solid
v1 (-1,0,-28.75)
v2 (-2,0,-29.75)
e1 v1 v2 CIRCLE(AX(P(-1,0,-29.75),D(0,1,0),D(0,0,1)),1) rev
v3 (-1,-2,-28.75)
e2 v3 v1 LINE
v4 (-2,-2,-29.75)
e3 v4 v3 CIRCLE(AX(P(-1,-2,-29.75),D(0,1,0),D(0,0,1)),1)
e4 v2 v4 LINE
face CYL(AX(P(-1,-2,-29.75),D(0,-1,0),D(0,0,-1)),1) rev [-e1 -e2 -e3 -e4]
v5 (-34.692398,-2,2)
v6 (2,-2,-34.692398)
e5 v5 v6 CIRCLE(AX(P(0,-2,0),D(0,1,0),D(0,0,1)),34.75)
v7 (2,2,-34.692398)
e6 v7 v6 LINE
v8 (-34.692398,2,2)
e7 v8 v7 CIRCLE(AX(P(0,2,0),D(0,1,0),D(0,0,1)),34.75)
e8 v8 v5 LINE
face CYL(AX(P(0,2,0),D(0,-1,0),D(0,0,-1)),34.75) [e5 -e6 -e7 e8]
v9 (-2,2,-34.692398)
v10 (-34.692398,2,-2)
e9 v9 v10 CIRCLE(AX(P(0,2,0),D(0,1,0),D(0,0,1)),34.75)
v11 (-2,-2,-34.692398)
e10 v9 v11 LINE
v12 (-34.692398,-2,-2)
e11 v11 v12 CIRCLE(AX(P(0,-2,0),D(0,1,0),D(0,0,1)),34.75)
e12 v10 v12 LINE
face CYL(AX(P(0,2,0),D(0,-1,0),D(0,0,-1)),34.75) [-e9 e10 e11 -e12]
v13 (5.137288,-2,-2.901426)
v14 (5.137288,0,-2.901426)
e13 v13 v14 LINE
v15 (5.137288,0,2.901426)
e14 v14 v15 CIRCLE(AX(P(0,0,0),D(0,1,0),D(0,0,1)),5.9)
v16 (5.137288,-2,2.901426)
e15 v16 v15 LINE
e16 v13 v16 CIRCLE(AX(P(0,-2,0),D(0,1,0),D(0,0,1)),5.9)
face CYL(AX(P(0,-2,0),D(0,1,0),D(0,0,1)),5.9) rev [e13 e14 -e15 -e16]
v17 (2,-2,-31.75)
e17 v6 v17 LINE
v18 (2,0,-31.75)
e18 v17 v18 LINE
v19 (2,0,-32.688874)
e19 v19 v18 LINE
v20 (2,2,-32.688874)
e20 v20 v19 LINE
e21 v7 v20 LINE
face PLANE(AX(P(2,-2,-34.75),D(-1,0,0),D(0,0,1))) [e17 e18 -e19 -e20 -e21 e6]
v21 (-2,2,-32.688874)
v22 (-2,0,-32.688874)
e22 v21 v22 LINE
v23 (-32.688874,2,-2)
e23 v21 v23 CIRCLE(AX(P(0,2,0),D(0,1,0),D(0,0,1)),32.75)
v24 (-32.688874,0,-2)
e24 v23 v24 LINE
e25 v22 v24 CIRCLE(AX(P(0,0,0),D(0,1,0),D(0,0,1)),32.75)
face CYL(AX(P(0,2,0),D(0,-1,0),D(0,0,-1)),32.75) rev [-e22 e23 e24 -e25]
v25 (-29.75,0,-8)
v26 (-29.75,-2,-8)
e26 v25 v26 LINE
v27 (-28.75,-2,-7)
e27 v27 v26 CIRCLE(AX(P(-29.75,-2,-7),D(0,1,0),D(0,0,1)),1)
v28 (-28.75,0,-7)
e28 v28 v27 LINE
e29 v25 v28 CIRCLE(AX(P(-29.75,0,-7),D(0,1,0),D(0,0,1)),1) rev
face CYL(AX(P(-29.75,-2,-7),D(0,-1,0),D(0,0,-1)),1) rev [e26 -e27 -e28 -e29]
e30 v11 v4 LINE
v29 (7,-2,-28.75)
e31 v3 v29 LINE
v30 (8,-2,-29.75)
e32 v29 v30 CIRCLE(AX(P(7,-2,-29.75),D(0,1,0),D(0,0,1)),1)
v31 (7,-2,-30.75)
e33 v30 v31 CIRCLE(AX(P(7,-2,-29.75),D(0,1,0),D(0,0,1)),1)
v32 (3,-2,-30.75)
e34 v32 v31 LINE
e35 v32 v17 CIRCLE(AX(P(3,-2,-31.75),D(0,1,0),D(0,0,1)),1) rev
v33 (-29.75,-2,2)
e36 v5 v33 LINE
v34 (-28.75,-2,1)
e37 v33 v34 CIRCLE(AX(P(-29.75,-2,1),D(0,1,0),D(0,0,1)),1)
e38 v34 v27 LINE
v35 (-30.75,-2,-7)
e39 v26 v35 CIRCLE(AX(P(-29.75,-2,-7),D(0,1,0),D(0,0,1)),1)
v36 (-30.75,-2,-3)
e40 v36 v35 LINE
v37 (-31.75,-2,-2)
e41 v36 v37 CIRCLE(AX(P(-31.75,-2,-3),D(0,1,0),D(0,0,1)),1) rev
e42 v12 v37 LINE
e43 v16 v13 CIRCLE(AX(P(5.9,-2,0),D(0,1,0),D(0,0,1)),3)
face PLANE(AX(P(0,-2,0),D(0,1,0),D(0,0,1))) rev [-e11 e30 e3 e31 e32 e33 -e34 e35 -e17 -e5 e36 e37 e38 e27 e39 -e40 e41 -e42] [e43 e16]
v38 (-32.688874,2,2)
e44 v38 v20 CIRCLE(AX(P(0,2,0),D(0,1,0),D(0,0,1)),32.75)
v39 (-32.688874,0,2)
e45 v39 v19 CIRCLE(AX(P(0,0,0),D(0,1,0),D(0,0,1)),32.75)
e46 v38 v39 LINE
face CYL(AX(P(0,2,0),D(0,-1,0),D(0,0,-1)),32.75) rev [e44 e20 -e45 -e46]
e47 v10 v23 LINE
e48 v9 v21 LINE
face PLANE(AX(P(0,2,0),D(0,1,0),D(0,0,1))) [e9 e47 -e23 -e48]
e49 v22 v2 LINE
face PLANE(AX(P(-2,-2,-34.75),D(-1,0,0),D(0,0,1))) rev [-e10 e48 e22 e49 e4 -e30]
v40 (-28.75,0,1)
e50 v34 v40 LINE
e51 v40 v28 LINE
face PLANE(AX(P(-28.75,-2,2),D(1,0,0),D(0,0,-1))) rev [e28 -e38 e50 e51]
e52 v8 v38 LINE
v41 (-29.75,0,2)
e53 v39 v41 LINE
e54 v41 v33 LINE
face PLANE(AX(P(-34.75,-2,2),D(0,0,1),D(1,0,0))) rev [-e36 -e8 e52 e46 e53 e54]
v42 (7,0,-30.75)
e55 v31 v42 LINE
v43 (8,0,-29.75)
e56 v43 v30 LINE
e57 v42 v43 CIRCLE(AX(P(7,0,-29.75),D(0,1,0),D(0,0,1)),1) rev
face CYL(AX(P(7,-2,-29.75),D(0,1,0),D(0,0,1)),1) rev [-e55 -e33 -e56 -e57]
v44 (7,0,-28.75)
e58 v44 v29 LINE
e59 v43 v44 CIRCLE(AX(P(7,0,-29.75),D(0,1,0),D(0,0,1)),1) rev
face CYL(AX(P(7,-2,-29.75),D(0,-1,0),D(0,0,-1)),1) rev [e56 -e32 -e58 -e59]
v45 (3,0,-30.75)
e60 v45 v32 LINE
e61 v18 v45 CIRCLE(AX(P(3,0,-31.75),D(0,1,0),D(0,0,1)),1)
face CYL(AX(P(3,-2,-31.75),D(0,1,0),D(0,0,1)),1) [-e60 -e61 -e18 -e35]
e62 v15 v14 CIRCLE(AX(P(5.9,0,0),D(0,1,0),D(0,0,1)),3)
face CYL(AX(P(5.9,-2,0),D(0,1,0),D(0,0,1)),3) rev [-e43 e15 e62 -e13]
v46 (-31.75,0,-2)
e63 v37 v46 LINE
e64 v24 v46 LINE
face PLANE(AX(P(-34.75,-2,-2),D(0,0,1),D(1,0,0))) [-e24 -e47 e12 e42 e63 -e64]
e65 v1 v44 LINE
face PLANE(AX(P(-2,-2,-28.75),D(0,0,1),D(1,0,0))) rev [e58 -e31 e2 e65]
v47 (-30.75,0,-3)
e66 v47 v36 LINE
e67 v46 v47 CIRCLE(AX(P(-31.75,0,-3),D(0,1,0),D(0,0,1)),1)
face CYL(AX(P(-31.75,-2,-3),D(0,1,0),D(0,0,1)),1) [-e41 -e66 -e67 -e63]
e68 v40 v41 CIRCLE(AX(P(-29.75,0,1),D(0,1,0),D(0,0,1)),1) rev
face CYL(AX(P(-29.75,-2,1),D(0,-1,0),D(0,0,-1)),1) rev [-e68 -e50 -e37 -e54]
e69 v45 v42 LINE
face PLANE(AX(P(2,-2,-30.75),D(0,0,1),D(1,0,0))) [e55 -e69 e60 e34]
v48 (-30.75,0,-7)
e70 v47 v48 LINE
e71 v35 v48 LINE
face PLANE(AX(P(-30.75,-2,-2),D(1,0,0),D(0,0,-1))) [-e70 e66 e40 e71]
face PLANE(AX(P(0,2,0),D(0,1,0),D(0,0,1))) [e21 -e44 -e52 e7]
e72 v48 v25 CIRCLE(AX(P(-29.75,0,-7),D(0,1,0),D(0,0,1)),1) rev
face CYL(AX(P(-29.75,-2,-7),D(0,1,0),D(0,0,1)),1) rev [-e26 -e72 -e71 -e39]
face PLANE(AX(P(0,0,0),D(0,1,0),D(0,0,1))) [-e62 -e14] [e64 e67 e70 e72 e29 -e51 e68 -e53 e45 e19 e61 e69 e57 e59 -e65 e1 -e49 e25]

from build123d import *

# Parameters (mm, degrees)
SKETCH1_R                     = 32.75
OUTER_DISK_DEPTH              = 2
ENCLOSEMENT_T                 = 2
HOOK_RELEASE_DEPTH            = 50.184601249
CIRPATTERN1_COUNT             = 2
CIRPATTERN1_ANGLE             = 90
SERVO_MOTOR_CUTOUT_DEPTH      = 50.184601249
SERVO_MOTOR_CUTOUT_DEPTH_BACK = 50.184601249
SKETCH3_R                     = 3
SKETCH3_R_2                   = 5.9
FILLET1_R                     = 1


with BuildPart() as part:
    # Sketch1 → Outer DIsk (new body)
    with BuildSketch(Plane(origin=(0, 0, 0), x_dir=(1, 0, 0), z_dir=(0, 1, 0))):
        with Locations(Location((0, 0, 0), (0, 0, 270))):
            Circle(SKETCH1_R)
    extrude(amount=OUTER_DISK_DEPTH)

    # Enclosement
    enclosement_openings = [part.faces().sort_by_distance(p)[0] for p in [
        (0, 2, 0),
    ]]
    offset(amount=ENCLOSEMENT_T, openings=enclosement_openings, kind=Kind.INTERSECTION)

    # Sketch2 → Hook Release (cut, symmetric)
    with BuildSketch(Plane(origin=(0, 0, 0), x_dir=(1, 0, 0), z_dir=(0, 1, 0))):
        Polygon((-2, 34.75), (-2, 28.75), (8, 28.75), (8, 30.75), (2, 30.75), (2, 34.75), align=None)
    hook_release = extrude(amount=HOOK_RELEASE_DEPTH, both=True, mode=Mode.SUBTRACT)

    # CirPattern1: Hook Release ×2 about axis
    cirpattern1_axis = Axis((0, 0, 0), (0, 1, 0))
    for i in range(1, CIRPATTERN1_COUNT):
        add(hook_release.rotate(cirpattern1_axis, i * CIRPATTERN1_ANGLE / (CIRPATTERN1_COUNT - 1)), mode=Mode.SUBTRACT)

    # Sketch3 → Servo Motor Cutout (cut, two sides: drawn at the far end of the back side and taken through both)
    with BuildSketch(Plane(origin=(0, 0, 0), x_dir=(1, 0, 0), z_dir=(0, 1, 0)).offset(-SERVO_MOTOR_CUTOUT_DEPTH_BACK)):
        with Locations((5.9, 0)):
            Circle(SKETCH3_R)
        Circle(SKETCH3_R_2)
    extrude(amount=SERVO_MOTOR_CUTOUT_DEPTH + SERVO_MOTOR_CUTOUT_DEPTH_BACK, mode=Mode.SUBTRACT)

    # Fillet1
    fillet1_edges = [part.edges().sort_by_distance(p)[0] for p in [
        (-28.75, -1, 2),
        (-28.75, -1, -8),
        (-30.75, -1, -8),
        (-30.75, -1, -2),
        (8, -1, -28.75),
        (-2, -1, -28.75),
        (8, -1, -30.75),
        (2, -1, -30.75),
    ]]
    fillet(fillet1_edges, radius=FILLET1_R - 0.0001)  # a hair under: the kernel refuses the full size


solid = part.part
